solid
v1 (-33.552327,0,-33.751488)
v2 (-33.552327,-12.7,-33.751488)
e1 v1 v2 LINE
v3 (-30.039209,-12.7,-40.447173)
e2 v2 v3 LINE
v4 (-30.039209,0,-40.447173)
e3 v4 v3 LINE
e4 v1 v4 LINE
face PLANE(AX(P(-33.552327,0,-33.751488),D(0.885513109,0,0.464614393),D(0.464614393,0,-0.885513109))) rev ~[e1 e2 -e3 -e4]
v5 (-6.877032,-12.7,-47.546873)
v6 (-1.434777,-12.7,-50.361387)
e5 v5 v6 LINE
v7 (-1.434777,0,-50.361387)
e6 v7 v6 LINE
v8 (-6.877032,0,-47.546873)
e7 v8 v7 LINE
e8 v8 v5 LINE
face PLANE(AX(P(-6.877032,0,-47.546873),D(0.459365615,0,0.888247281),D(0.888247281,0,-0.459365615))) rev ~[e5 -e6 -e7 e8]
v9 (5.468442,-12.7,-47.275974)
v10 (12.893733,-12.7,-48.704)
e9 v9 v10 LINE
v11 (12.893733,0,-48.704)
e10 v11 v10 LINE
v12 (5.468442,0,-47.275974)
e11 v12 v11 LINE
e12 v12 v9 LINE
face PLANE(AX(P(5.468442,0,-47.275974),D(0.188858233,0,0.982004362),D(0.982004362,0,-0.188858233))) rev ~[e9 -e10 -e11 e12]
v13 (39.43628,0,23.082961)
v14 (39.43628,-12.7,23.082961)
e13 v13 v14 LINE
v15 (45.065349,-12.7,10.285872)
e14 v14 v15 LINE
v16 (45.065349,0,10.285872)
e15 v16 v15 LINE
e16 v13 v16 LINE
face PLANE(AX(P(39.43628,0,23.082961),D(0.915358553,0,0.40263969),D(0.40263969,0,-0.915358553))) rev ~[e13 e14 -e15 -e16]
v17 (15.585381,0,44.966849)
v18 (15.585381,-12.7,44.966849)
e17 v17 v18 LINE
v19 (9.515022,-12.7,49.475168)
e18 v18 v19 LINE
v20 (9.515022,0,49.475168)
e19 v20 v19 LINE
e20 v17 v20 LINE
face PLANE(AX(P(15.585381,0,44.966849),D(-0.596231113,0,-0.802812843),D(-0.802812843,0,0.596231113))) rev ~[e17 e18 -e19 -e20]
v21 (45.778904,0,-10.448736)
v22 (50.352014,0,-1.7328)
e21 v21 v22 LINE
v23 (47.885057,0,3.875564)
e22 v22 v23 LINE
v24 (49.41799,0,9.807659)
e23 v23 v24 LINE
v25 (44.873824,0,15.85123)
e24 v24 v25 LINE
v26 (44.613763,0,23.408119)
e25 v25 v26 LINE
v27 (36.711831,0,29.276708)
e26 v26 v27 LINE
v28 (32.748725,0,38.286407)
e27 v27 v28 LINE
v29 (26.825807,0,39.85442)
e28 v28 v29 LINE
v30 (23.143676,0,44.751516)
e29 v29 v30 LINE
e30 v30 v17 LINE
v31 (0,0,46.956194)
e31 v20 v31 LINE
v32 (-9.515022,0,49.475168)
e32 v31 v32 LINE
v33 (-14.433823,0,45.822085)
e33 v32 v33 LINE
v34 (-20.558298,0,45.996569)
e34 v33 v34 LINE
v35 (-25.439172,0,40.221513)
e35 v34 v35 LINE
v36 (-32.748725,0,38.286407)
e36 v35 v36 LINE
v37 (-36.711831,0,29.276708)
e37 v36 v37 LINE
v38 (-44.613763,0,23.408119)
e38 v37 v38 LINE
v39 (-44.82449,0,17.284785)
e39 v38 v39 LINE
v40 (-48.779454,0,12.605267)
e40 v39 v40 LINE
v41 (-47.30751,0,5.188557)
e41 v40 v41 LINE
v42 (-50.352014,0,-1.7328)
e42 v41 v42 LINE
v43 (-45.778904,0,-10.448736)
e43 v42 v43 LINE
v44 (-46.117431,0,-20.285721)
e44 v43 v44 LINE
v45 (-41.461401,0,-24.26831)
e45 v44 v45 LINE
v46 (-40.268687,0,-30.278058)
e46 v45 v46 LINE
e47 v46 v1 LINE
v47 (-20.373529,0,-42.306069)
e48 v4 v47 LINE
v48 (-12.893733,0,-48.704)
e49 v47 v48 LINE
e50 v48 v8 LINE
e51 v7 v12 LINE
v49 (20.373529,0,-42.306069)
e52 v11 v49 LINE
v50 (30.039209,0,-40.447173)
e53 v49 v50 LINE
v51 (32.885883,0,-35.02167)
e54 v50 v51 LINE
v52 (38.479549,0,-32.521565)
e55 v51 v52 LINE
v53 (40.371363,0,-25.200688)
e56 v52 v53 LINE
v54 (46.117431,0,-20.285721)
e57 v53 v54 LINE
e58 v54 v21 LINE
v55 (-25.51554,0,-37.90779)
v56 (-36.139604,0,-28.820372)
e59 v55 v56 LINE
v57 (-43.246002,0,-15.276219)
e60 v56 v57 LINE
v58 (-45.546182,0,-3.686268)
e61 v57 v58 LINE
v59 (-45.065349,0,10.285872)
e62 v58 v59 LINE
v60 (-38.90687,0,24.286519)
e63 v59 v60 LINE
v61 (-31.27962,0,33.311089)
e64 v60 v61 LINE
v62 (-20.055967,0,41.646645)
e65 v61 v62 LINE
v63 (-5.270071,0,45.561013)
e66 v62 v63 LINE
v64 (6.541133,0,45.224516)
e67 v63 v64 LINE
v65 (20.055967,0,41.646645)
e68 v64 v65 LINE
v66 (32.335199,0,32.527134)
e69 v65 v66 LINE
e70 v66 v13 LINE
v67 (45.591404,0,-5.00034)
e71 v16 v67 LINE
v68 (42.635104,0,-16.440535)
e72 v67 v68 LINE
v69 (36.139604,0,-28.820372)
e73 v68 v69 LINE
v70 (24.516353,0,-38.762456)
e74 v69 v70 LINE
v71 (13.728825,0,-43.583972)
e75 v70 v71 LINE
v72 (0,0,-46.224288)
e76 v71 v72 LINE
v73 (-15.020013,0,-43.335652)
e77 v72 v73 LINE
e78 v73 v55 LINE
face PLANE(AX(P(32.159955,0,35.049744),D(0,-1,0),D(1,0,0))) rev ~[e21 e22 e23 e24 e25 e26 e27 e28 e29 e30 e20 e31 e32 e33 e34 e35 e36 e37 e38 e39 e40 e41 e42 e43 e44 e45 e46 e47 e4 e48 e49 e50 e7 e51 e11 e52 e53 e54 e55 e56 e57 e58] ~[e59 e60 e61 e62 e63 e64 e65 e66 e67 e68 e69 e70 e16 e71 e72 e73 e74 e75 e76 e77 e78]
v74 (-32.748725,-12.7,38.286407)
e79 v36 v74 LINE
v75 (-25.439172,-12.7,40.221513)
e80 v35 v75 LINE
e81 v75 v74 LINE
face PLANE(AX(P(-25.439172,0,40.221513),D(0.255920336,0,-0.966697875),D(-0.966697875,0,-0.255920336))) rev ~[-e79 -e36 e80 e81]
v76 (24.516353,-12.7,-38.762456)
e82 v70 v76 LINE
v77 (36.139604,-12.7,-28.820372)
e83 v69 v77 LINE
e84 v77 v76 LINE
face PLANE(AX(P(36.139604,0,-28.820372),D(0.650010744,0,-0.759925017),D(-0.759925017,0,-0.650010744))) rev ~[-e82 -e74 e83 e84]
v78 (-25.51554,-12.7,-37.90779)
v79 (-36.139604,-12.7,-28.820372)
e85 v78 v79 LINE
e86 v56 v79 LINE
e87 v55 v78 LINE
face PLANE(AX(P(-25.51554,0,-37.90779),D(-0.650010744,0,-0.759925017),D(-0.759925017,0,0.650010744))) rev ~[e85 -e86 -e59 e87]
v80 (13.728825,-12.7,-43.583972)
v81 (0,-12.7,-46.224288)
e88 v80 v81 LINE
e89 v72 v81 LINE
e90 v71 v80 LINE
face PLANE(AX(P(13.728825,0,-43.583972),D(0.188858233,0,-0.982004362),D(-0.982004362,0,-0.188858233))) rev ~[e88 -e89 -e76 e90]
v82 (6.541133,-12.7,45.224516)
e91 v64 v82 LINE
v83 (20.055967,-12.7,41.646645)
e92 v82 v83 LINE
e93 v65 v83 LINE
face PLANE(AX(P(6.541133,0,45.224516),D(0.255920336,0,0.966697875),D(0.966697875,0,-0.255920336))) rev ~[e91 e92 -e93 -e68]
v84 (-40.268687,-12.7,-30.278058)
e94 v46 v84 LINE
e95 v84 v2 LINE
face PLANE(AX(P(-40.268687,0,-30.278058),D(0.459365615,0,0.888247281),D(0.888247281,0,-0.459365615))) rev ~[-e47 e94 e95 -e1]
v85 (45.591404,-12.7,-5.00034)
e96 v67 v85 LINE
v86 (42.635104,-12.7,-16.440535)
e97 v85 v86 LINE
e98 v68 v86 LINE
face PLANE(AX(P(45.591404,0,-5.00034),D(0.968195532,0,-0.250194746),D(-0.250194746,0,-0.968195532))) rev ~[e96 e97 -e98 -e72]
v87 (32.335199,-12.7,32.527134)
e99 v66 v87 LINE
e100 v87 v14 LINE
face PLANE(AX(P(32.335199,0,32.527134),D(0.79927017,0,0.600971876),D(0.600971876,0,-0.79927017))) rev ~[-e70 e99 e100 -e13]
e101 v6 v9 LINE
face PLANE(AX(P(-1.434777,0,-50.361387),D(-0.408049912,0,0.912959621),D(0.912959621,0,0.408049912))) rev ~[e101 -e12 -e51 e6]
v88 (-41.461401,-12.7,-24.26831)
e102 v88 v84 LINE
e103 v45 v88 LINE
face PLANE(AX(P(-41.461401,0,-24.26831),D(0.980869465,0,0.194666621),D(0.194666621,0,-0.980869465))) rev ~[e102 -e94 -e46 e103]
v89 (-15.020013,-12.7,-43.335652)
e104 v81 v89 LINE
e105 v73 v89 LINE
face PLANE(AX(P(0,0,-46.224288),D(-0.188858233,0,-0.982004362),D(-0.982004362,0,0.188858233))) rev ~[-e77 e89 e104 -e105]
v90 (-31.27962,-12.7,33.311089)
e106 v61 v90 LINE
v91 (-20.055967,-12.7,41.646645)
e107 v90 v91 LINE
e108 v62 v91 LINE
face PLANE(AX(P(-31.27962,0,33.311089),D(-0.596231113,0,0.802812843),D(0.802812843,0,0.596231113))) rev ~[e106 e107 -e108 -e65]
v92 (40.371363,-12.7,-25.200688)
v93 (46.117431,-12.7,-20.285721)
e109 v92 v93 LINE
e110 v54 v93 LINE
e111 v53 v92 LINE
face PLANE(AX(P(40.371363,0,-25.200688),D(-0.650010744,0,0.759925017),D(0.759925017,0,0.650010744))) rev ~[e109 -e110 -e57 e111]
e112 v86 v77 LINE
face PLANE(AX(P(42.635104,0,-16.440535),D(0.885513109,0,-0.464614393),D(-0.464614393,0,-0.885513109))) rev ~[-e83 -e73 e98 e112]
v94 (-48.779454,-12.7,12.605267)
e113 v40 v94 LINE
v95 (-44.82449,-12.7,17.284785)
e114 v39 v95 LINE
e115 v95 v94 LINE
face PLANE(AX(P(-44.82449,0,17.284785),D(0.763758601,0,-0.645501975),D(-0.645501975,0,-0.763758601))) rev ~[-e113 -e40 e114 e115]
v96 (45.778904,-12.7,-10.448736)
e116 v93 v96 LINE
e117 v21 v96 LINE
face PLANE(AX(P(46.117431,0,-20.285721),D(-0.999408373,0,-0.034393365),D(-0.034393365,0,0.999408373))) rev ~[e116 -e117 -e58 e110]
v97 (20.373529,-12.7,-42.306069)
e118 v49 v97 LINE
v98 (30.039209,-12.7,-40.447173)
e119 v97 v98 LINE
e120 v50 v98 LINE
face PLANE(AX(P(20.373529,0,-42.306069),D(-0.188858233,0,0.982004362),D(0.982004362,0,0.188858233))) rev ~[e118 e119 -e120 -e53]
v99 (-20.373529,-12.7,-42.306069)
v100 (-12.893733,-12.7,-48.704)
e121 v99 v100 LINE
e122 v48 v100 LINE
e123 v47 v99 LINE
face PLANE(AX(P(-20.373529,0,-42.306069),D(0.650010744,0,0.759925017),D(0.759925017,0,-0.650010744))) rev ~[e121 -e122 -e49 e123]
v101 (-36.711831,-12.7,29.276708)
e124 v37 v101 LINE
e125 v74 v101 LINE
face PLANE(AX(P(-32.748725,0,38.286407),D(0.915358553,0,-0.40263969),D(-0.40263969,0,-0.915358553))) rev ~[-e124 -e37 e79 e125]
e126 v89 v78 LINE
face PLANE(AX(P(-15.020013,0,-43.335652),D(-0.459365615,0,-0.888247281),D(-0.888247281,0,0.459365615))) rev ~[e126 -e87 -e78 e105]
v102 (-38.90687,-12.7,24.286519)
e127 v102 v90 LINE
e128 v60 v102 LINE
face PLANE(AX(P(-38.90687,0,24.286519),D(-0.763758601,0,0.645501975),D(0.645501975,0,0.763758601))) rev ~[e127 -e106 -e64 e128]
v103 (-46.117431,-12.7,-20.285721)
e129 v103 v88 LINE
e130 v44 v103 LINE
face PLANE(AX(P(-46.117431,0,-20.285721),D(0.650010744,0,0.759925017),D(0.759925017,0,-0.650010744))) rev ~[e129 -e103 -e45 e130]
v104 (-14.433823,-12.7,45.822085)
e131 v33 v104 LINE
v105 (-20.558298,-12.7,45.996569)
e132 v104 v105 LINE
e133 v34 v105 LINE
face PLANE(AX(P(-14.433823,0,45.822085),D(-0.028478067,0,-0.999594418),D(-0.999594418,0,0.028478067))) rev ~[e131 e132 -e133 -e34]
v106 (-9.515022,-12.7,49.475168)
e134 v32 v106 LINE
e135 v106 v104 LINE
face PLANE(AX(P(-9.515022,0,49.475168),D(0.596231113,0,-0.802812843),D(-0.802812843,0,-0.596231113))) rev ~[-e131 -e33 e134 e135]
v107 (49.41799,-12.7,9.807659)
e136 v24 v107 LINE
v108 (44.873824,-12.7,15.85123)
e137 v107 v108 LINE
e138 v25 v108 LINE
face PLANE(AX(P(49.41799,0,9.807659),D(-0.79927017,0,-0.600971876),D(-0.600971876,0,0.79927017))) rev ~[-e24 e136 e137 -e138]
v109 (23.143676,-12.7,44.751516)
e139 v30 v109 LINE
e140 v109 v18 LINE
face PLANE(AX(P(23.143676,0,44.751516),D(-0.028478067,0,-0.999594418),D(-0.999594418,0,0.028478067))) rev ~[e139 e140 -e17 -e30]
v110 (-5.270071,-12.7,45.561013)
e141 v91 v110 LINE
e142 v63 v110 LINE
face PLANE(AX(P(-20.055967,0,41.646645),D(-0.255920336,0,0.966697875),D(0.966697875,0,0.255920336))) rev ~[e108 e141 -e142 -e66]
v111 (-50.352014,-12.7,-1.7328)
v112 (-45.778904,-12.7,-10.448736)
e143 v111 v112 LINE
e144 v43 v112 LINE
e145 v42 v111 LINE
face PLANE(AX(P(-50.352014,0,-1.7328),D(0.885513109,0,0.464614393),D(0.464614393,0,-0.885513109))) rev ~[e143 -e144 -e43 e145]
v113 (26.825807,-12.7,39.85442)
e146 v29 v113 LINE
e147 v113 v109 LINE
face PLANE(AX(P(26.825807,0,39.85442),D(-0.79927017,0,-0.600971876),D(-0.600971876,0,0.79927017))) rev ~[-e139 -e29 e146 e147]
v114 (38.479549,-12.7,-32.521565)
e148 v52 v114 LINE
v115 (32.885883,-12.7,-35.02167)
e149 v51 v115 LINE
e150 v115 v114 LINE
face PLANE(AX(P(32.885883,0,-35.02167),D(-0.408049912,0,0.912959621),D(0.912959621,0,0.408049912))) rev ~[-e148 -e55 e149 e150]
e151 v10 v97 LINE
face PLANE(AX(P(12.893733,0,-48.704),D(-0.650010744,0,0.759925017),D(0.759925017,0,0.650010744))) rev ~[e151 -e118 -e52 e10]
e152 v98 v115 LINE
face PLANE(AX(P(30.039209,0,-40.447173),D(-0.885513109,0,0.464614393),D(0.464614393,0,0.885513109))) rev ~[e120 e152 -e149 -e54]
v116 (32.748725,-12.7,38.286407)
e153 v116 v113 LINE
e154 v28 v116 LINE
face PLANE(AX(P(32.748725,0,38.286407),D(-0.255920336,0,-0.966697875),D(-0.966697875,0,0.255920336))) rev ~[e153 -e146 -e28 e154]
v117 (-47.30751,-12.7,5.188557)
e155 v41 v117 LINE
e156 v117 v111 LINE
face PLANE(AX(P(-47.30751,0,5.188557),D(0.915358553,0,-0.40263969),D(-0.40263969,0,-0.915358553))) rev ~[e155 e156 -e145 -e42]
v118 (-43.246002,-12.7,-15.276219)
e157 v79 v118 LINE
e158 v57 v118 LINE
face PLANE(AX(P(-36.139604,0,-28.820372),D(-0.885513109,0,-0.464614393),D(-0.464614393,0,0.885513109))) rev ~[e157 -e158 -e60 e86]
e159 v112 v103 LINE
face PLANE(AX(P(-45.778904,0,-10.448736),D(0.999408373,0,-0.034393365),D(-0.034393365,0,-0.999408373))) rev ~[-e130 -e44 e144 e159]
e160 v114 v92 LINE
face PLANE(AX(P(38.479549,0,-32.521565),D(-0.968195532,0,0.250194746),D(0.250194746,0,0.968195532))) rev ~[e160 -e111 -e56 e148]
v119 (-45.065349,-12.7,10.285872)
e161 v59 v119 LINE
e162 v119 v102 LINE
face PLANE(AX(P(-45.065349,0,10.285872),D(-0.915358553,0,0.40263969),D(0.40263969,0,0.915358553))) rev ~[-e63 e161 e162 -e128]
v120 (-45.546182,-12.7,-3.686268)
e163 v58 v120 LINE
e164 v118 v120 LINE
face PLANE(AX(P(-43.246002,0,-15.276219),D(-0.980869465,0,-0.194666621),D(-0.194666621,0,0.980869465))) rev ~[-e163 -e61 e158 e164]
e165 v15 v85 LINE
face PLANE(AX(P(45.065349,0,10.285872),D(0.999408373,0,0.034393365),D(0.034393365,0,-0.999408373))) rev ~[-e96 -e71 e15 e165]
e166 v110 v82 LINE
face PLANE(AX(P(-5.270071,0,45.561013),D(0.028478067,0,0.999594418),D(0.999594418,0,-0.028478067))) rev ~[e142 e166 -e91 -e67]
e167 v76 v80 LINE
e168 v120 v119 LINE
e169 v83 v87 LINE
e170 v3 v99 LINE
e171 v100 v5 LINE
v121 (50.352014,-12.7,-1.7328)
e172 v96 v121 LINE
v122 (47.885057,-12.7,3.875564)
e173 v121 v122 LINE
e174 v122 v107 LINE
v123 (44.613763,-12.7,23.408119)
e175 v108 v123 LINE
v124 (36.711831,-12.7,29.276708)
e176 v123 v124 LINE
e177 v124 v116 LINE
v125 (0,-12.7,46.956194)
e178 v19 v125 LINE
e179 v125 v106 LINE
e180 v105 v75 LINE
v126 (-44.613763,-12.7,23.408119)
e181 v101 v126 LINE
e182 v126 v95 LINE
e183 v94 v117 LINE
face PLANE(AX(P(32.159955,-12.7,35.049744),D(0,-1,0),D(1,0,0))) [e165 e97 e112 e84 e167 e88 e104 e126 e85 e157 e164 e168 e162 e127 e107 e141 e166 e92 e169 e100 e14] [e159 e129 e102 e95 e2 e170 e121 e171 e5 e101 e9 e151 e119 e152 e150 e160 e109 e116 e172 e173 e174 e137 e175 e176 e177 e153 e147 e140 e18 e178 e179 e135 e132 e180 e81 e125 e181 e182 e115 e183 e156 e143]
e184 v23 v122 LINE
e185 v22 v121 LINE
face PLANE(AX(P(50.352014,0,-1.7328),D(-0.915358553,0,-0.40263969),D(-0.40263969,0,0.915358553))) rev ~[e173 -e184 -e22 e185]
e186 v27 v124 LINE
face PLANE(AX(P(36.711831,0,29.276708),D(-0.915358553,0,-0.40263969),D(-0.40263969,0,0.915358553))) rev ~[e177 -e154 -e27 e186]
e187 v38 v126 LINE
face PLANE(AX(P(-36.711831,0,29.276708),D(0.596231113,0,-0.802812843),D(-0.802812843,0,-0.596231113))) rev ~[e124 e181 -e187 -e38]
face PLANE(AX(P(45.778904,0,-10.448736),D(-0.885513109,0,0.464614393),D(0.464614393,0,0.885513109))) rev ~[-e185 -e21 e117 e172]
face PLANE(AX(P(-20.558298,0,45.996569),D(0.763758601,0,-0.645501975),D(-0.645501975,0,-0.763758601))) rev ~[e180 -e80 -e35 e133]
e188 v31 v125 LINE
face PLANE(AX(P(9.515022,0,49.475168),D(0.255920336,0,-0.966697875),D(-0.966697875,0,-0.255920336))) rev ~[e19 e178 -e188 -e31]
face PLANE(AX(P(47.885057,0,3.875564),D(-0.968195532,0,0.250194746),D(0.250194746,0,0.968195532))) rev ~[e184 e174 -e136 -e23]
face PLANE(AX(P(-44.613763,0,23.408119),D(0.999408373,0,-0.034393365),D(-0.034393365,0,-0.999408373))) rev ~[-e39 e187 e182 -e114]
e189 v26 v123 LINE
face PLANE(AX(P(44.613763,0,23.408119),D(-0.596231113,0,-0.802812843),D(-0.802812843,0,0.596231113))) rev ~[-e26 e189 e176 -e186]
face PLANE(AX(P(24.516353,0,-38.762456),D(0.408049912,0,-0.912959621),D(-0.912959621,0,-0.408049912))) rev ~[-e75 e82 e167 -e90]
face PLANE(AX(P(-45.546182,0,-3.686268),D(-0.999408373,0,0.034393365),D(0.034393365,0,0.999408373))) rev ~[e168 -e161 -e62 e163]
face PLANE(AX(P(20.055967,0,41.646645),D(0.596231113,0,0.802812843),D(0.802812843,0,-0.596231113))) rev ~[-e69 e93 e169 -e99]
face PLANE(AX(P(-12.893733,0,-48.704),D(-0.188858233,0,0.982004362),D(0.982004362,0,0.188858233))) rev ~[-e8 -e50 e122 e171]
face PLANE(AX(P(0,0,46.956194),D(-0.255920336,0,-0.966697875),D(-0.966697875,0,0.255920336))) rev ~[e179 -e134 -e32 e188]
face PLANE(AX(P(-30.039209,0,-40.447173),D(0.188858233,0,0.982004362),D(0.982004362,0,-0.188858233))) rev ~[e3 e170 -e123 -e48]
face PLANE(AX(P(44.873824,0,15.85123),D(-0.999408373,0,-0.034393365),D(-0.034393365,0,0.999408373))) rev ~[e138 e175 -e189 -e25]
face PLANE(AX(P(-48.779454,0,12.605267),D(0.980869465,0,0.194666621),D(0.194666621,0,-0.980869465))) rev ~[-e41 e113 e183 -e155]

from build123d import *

# Parameters (mm, degrees)
F1_DEPTH = 12.7


with BuildPart() as f1:
    # F0 (on Front) → F1 (new body)
    with BuildSketch(Plane.XZ):
        Polygon((36.7118305086, 29.2767078878), (32.7487252653, 38.2864065468), (26.8258066759, 39.8544200468), (32.3351986213, 32.527134341), align=None)
        Polygon((44.6137633316, 23.4081194068), (36.7118305086, 29.2767078878), (39.4362804042, 23.0829605448), (44.8738240342, 15.8512304175), align=None)
        Polygon((39.4362804042, 23.0829605448), (36.7118305086, 29.2767078878), (32.3351986213, 32.527134341), align=None)
        Polygon((32.3351986213, 32.527134341), (26.8258066759, 39.8544200468), (20.0559669896, 41.6466445828), align=None)
        Polygon((20.0559669896, 41.6466445828), (26.8258066759, 39.8544200468), (23.143676418, 44.7515158919), (15.5853806795, 44.9668488809), align=None)
        Polygon((44.8738240342, 15.8512304175), (39.4362804042, 23.0829605448), (45.0653487584, 10.2858717752), align=None)
        Polygon((6.5411333928, 45.2245160678), (20.0559669896, 41.6466445828), (15.5853806795, 44.9668488809), align=None)
        Polygon((44.8738240342, 15.8512304175), (45.0653487584, 10.2858717752), (47.8850571971, 3.8755642564), (49.4179902366, 9.8076589327), align=None)
        Polygon((47.8850571971, 3.8755642564), (45.0653487584, 10.2858717752), (45.5914042437, -5.0003397286), align=None)
        Polygon((-5.2700710808, 45.5610128193), (6.5411333928, 45.2245160678), (0, 46.9561936707), align=None)
        Polygon((0, 46.9561936707), (6.5411333928, 45.2245160678), (15.5853806795, 44.9668488809), (9.5150217621, 49.4751684548), align=None)
        Polygon((50.3520142156, -1.7328003913), (47.8850571971, 3.8755642564), (45.5914042437, -5.0003397286), (45.7789038594, -10.4487360706), align=None)
        Polygon((45.7789038594, -10.4487360706), (45.5914042437, -5.0003397286), (42.6351039178, -16.440535075), align=None)
        Polygon((-5.2700710808, 45.5610128193), (0, 46.9561936707), (-9.5150217621, 49.4751684548), (-14.433823419, 45.82208466), align=None)
        Polygon((-20.0559669896, 41.6466445828), (-5.2700710808, 45.5610128193), (-14.433823419, 45.82208466), align=None)
        Polygon((46.1174311574, -20.2857209931), (45.7789038594, -10.4487360706), (42.6351039178, -16.440535075), (40.371362632, -25.2006878565), align=None)
        Polygon((40.371362632, -25.2006878565), (42.6351039178, -16.440535075), (36.1396037465, -28.8203722726), align=None)
        Polygon((-25.4391722107, 40.2215129805), (-20.0559669896, 41.6466445828), (-14.433823419, 45.82208466), (-20.5582977883, 45.99656862), align=None)
        Polygon((-31.2796204782, 33.3110885798), (-20.0559669896, 41.6466445828), (-25.4391722107, 40.2215129805), align=None)
        Polygon((40.371362632, -25.2006878565), (36.1396037465, -28.8203722726), (32.8858829718, -35.0216704662), (38.4795494638, -32.5215652427), align=None)
        Polygon((32.8858829718, -35.0216704662), (36.1396037465, -28.8203722726), (24.5163525755, -38.7624559943), align=None)
        Polygon((-38.9068697692, 24.2865193693), (-31.2796204782, 33.3110885798), (-36.7118305086, 29.2767078878), align=None)
        Polygon((-36.7118305086, 29.2767078878), (-31.2796204782, 33.3110885798), (-25.4391722107, 40.2215129805), (-32.7487252653, 38.2864065468), align=None)
        Polygon((30.0392094677, -40.4471732921), (32.8858829718, -35.0216704662), (24.5163525755, -38.7624559943), (20.3735288846, -42.3060686525), align=None)
        Polygon((20.3735288846, -42.3060686525), (24.5163525755, -38.7624559943), (13.7288245836, -43.5839724576), align=None)
        Polygon((-38.9068697692, 24.2865193693), (-36.7118305086, 29.2767078878), (-44.6137633316, 23.4081194068), (-44.8244900831, 17.284784924), align=None)
        Polygon((-45.0653487584, 10.2858717752), (-38.9068697692, 24.2865193693), (-44.8244900831, 17.284784924), align=None)
        Polygon((12.8937326976, -48.703999732), (20.3735288846, -42.3060686525), (13.7288245836, -43.5839724576), (5.4684417421, -47.2759741742), align=None)
        Polygon((5.4684417421, -47.2759741742), (13.7288245836, -43.5839724576), (0, -46.2242881707), align=None)
        Polygon((-47.3075095617, 5.1885574364), (-45.0653487584, 10.2858717752), (-44.8244900831, 17.284784924), (-48.7794544472, 12.6052670182), align=None)
        Polygon((-45.5461821411, -3.6862680312), (-45.0653487584, 10.2858717752), (-47.3075095617, 5.1885574364), align=None)
        Polygon((5.4684417421, -47.2759741742), (0, -46.2242881707), (-6.8770318811, -47.5468730158), (-1.4347768951, -50.3613874713), align=None)
        Polygon((-6.8770318811, -47.5468730158), (0, -46.2242881707), (-15.0200126245, -43.3356522862), align=None)
        Polygon((-43.2460019659, -15.2762185204), (-45.5461821411, -3.6862680312), (-45.7789038594, -10.4487360706), align=None)
        Polygon((-45.7789038594, -10.4487360706), (-45.5461821411, -3.6862680312), (-47.3075095617, 5.1885574364), (-50.3520142156, -1.7328003913), align=None)
        Polygon((-12.8937326976, -48.703999732), (-6.8770318811, -47.5468730158), (-15.0200126245, -43.3356522862), (-20.3735288846, -42.3060686525), align=None)
        Polygon((-20.3735288846, -42.3060686525), (-15.0200126245, -43.3356522862), (-25.515539679, -37.9077896286), align=None)
        Polygon((-43.2460019659, -15.2762185204), (-45.7789038594, -10.4487360706), (-46.1174311574, -20.2857209931), (-41.4614014616, -24.2683104051), align=None)
        Polygon((-36.1396037465, -28.8203722726), (-43.2460019659, -15.2762185204), (-41.4614014616, -24.2683104051), align=None)
        Polygon((-30.0392094677, -40.4471732921), (-20.3735288846, -42.3060686525), (-25.515539679, -37.9077896286), (-33.5523273154, -33.7514876846), align=None)
        Polygon((-33.5523273154, -33.7514876846), (-25.515539679, -37.9077896286), (-36.1396037465, -28.8203722726), align=None)
        Polygon((-33.5523273154, -33.7514876846), (-36.1396037465, -28.8203722726), (-41.4614014616, -24.2683104051), (-40.2686869878, -30.2780577489), align=None)
    extrude(amount=F1_DEPTH)


solid = f1.part
